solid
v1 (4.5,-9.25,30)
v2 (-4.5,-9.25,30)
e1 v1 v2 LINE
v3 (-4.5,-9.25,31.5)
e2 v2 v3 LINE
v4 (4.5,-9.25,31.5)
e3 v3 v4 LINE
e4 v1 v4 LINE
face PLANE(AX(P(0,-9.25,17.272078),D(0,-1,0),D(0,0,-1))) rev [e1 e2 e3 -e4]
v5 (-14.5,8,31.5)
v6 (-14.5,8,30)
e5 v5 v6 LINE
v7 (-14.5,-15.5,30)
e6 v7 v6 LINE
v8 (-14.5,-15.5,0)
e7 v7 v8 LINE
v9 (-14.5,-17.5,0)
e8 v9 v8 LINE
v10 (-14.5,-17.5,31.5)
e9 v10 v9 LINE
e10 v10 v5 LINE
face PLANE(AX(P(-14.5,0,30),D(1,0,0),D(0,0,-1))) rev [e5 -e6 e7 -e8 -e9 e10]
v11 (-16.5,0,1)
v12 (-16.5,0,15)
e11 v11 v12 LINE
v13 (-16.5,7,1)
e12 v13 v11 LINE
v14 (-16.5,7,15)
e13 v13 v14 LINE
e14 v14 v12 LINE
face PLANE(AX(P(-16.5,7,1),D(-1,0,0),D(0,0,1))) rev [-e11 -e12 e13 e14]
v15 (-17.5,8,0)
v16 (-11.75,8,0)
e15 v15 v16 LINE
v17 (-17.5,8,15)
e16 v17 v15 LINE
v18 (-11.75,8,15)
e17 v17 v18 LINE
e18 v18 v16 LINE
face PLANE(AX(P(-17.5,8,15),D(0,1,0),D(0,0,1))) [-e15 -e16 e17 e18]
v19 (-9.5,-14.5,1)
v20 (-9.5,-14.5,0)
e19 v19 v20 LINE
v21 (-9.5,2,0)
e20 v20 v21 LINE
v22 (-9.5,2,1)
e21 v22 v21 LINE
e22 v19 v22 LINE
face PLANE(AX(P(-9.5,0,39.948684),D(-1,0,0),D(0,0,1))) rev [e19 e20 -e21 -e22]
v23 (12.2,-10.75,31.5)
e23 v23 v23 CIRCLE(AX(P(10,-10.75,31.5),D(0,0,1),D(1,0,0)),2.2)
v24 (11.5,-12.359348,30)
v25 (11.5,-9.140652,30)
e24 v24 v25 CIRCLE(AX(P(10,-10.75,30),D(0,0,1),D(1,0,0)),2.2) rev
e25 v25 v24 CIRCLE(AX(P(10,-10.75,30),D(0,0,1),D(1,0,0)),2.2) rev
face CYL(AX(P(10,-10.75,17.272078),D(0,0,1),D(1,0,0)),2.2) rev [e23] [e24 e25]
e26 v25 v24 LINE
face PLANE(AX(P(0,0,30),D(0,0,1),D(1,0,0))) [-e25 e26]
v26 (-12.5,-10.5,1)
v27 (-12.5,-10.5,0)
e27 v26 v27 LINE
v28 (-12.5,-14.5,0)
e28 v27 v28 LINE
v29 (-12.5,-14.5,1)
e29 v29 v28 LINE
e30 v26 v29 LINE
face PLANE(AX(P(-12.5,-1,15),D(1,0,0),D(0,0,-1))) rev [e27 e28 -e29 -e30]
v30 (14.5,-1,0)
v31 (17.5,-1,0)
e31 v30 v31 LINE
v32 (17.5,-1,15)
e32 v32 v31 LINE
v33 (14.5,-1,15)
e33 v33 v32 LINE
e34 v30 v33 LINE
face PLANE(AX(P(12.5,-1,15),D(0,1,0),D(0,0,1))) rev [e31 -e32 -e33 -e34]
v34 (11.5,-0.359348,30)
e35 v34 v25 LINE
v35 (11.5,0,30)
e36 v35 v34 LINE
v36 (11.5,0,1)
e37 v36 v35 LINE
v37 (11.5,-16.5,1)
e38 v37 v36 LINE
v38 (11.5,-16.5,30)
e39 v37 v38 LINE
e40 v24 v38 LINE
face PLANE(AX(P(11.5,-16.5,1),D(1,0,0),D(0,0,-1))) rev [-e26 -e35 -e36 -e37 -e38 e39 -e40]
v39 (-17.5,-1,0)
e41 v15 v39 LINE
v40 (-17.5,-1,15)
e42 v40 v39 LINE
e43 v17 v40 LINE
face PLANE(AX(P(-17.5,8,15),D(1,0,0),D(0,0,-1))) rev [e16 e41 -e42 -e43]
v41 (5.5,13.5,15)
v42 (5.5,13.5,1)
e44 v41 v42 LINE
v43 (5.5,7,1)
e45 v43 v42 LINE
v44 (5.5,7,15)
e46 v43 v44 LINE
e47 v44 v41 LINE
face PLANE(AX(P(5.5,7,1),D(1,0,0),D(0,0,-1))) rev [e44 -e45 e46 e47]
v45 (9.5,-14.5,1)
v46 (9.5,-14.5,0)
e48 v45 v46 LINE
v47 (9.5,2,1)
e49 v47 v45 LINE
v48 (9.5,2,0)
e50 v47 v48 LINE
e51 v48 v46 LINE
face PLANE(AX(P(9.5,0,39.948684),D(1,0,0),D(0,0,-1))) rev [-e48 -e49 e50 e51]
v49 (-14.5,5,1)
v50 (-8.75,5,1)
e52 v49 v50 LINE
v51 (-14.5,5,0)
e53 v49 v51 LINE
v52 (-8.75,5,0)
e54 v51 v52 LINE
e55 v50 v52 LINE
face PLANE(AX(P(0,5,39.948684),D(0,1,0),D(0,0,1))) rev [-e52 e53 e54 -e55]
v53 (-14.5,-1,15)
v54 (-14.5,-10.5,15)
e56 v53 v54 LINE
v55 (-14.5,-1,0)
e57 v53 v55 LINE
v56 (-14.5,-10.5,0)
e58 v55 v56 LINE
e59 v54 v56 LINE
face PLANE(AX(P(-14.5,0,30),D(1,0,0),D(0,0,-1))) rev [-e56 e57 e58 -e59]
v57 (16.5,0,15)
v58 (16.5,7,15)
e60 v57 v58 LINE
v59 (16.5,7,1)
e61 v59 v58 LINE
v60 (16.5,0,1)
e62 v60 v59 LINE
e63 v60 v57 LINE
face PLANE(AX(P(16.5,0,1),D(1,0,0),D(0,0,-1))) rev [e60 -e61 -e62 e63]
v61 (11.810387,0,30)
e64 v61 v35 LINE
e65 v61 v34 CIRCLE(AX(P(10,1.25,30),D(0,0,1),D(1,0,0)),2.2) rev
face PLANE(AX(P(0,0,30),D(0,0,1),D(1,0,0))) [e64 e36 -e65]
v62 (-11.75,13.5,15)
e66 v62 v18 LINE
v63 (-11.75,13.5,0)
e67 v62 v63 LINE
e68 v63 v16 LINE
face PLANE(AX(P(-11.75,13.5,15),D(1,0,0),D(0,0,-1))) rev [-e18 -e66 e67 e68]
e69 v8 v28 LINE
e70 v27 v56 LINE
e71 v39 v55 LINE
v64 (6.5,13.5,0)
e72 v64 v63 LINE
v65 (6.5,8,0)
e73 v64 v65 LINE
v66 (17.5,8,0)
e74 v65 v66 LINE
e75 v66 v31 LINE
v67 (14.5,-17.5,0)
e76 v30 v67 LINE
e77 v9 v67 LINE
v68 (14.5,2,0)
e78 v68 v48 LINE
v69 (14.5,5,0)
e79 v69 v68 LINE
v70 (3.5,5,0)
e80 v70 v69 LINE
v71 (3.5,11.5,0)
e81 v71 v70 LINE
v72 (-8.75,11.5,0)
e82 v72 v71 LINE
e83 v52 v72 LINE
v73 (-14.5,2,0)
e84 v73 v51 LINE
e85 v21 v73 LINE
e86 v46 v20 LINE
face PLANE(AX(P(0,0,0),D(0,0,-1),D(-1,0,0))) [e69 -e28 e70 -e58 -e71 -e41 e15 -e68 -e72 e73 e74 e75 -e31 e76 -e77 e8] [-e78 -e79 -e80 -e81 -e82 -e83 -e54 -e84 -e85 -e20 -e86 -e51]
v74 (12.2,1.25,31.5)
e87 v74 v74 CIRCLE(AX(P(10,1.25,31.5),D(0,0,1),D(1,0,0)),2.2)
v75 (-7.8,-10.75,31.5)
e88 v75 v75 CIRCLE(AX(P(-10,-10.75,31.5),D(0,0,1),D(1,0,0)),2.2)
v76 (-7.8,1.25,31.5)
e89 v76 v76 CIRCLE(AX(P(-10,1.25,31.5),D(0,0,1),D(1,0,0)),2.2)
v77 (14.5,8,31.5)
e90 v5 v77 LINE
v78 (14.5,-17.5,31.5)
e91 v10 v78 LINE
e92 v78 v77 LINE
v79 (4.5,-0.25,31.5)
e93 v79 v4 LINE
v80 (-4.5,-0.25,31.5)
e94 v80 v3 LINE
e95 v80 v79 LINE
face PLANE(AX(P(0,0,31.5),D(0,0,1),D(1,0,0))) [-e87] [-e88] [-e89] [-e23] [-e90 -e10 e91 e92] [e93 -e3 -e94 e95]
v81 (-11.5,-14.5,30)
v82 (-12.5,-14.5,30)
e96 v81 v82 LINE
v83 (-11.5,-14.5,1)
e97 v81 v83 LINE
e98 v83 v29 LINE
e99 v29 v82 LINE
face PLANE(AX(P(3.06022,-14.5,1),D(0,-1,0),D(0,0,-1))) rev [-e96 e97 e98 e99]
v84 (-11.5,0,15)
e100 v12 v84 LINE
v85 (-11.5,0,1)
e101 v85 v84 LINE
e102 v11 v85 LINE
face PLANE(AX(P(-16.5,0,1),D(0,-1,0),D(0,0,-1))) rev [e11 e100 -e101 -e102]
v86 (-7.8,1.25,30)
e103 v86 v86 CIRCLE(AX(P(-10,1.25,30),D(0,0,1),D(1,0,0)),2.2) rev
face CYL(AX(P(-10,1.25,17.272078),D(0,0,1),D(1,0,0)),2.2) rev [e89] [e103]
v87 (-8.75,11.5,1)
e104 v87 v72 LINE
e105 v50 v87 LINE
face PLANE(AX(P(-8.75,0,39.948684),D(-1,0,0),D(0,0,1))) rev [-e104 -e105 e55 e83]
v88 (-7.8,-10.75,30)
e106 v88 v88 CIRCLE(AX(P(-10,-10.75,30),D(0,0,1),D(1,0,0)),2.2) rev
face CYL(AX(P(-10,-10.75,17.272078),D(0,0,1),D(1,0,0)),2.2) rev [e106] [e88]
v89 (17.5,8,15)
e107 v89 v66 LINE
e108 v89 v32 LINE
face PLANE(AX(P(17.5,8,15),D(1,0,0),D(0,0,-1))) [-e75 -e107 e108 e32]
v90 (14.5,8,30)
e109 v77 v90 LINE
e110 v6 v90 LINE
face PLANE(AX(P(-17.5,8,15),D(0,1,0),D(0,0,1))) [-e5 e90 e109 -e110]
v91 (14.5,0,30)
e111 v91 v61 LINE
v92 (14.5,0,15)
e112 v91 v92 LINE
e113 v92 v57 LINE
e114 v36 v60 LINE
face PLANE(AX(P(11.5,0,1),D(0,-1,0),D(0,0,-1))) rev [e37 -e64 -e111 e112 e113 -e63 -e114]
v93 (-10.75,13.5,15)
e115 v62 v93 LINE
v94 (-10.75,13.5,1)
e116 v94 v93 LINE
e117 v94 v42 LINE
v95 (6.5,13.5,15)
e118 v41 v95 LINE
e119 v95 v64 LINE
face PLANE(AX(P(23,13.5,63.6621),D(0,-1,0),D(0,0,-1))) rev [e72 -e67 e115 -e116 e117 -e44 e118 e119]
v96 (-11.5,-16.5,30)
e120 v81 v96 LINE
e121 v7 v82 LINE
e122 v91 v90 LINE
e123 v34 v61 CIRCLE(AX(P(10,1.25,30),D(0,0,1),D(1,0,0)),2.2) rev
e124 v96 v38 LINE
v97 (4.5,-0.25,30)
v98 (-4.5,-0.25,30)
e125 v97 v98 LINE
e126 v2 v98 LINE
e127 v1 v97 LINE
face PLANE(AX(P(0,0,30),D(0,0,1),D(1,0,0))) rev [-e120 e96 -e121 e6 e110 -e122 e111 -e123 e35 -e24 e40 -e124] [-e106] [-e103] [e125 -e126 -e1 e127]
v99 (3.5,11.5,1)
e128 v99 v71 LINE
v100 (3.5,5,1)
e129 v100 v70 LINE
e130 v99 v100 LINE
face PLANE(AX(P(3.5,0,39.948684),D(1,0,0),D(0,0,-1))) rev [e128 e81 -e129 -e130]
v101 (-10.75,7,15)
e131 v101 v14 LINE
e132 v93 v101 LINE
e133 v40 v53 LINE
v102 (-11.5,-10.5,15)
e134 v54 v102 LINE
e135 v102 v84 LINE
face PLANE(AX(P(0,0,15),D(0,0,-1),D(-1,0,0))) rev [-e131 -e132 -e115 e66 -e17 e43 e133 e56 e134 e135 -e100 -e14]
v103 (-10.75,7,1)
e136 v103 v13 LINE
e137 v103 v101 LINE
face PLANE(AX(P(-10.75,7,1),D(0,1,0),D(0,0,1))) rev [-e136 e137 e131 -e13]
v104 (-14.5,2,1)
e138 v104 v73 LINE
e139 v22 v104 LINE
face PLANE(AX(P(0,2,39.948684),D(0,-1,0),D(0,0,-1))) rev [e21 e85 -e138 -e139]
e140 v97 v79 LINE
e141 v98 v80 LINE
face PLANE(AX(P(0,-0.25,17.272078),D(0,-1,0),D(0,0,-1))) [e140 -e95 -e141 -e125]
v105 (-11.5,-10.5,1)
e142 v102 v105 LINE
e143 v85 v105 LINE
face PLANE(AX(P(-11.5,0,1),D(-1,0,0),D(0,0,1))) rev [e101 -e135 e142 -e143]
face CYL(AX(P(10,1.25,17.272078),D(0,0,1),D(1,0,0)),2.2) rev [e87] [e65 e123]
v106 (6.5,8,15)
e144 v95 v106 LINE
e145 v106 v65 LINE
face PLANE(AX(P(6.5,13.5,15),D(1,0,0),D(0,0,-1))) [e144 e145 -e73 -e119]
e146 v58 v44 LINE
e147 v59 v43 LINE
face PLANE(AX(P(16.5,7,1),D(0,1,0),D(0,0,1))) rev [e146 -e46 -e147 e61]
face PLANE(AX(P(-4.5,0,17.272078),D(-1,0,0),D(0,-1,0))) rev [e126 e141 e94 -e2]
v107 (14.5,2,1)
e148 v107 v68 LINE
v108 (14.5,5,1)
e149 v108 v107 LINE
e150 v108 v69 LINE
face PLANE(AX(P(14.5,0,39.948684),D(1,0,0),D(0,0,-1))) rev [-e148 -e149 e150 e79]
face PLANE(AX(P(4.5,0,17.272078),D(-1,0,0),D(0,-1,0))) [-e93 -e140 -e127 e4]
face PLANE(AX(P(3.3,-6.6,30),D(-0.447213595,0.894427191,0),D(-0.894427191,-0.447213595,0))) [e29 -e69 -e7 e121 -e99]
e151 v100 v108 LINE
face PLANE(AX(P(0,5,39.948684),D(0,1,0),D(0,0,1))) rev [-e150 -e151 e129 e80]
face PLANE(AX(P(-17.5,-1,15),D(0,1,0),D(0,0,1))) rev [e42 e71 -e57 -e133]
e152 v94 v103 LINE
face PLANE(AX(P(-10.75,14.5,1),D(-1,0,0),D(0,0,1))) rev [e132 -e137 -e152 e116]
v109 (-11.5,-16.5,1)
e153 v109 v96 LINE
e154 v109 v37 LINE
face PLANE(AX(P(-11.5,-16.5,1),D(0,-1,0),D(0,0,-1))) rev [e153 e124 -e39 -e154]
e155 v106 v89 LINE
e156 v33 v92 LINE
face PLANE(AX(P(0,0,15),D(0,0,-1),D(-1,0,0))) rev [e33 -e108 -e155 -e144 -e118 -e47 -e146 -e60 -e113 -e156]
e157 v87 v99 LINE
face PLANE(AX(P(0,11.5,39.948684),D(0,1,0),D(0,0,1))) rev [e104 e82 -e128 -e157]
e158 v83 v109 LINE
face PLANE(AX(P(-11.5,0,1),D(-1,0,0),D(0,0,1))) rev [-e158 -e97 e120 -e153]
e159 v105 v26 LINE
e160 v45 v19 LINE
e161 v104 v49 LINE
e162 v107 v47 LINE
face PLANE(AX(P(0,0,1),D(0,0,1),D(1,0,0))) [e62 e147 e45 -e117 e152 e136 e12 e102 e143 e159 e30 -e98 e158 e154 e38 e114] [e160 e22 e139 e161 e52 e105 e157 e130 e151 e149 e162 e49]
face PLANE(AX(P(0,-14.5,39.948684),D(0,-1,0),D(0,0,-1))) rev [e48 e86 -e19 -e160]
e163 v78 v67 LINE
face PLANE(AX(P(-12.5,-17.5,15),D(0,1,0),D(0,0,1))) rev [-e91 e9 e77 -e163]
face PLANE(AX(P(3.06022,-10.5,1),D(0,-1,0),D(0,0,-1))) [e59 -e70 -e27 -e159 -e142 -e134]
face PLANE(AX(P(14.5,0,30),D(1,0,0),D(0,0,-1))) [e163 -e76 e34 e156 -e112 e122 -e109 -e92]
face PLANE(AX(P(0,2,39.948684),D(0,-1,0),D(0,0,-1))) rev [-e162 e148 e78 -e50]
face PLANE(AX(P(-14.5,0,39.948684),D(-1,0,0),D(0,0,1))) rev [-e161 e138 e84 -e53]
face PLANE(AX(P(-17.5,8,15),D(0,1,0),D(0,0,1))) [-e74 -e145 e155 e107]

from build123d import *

# Parameters (mm, degrees)
EXTRUDE_1_DEPTH        = 15
CUT_EXTRUDE_1_DEPTH    = 14
SKETCH_7_W             = 46
SKETCH_7_H             = 6
CUT_EXTRUDE_2_DEPTH    = 1
SKETCH_8_W             = 14
SKETCH_8_H             = 4
CUT_EXTRUDE_3_DEPTH    = 1
CUT_EXTRUDE_6_DEPTH    = 1
EXTRUDE_START          = -30
EXTRUDE_10_OUTLINE_W   = 3
EXTRUDE_10_OUTLINE_H   = 17.5
EXTRUDE_10_OUTLINE_H_2 = 10.5
EXTRUDE_10_OUTLINE_W_2 = 9
EXTRUDE_10_OUTLINE_H_3 = 1
EXTRUDE_10_OUTLINE_W_3 = 2
EXTRUDE_10_DEPTH       = 30
SKETCH_29_W            = 29
SKETCH_29_H            = 25.5
EXTRUDE_12_DEPTH       = 1.5
SKETCH_30_R            = 2.2
SKETCH_30_W            = 9
SKETCH_30_H            = 9
CUT_EXTRUDE_8_DEPTH    = 1.5
SKETCH_31_W            = 1.75
SKETCH_31_H            = 1
EXTRUDE_13_DEPTH       = 15
SKETCH_33_W            = 9
SKETCH_33_H            = 1
SKETCH_33_W_2          = 3.75
CUT_EXTRUDE_9_DEPTH    = 15
SKETCH_38_W            = 3
SKETCH_38_H            = 10.5
CUT_EXTRUDE_11_DEPTH   = 15
SKETCH_39_W            = 29
SKETCH_39_H            = 1
EXTRUDE_14_DEPTH       = 30
SKETCH_40_W            = 48
SKETCH_40_H            = 8
CUT_EXTRUDE_12_DEPTH   = 15


# Read off the part's stored shape, not the designer's step: 凸台-拉伸10
with BuildPart() as part:
    # 草图3 → 凸台-拉伸1 (new body)
    with BuildSketch(Plane.XY):
        Polygon((-25, 21.5), (23, 21.5), (23, 13.5), (6.5, 13.5), (6.5, 8), (17.5, 8), (17.5, -1), (12.5, -1), (12.5, -17.5), (-12.5, -17.5), (-12.5, -1), (-17.5, -1), (-17.5, 8), (-11.75, 8), (-11.75, 13.5), (-25, 13.5), align=None)
    extrude(amount=EXTRUDE_1_DEPTH)

    # 草图4 → 切除-拉伸1 (cut)
    with BuildSketch(Plane.XY.offset(15)):
        Polygon((22, 20.5), (-24, 20.5), (-24, 14.5), (-10.75, 14.5), (-10.75, 7), (-16.5, 7), (-16.5, 0), (-11.5, 0), (-11.5, -16.5), (11.5, -16.5), (11.5, 0), (16.5, 0), (16.5, 7), (5.5, 7), (5.5, 14.5), (22, 14.5), align=None)
    extrude(amount=-CUT_EXTRUDE_1_DEPTH, mode=Mode.SUBTRACT)

    # 草图7 → 切除-拉伸2 (cut)
    with BuildSketch(Plane.XY.offset(1)):
        with Locations((-1, 17.5)):
            Rectangle(SKETCH_7_W, SKETCH_7_H)
    extrude(amount=-CUT_EXTRUDE_2_DEPTH, mode=Mode.SUBTRACT)

    # 草图8 → 切除-拉伸3 (cut)
    with BuildSketch(Plane.ZY.offset(12.5)):
        with Locations((8, -12.5)):
            Rectangle(SKETCH_8_W, SKETCH_8_H)
    extrude(amount=-CUT_EXTRUDE_3_DEPTH, mode=Mode.SUBTRACT)

    # 草图9 → 切除-拉伸6 (cut)
    with BuildSketch(Plane(origin=(0, 0, 0), x_dir=(-1, 0, 0), z_dir=(0, 0, -1))):
        Polygon((-3.5, 11.5), (-3.5, 5), (-14.5, 5), (-14.5, 2), (-9.5, 2), (-9.5, -14.5), (9.5, -14.5), (9.5, 2), (14.5, 2), (14.5, 5), (8.75, 5), (8.75, 11.5), align=None)
    extrude(amount=-CUT_EXTRUDE_6_DEPTH, mode=Mode.SUBTRACT)

    # 凸台-拉伸10 outline → 凸台-拉伸10 (add)
    with BuildSketch(Plane(origin=(0, 0, 0), x_dir=(-1, 0, 0), z_dir=(0, 0, -1)).offset(EXTRUDE_START)):
        with Locations((-13, -8.75)):
            Rectangle(EXTRUDE_10_OUTLINE_W, EXTRUDE_10_OUTLINE_H)
        Polygon((14.5, -15.5), (12.5, -14.5), (11.5, -14.5), (11.5, -17.5), (14.5, -17.5), align=None)
        with Locations((13, -5.25)):
            Rectangle(EXTRUDE_10_OUTLINE_W, EXTRUDE_10_OUTLINE_H_2)
        with Locations((-10, 7.5)):
            Rectangle(EXTRUDE_10_OUTLINE_W_2, EXTRUDE_10_OUTLINE_H_3)
        with Locations((13.5, 7.5)):
            Rectangle(EXTRUDE_10_OUTLINE_W_3, EXTRUDE_10_OUTLINE_H_3)
    extrude(amount=EXTRUDE_10_DEPTH)

    # 草图29 → 凸台-拉伸12 (add)
    with BuildSketch(Plane.XY.offset(30)):
        with Locations((0, -4.75)):
            Rectangle(SKETCH_29_W, SKETCH_29_H)
    extrude(amount=EXTRUDE_12_DEPTH)

    # 草图30 → 切除-拉伸8 (cut)
    with BuildSketch(Plane.XY.offset(31.5)):
        with Locations((-10, 1.25)):
            Circle(SKETCH_30_R)
        with Locations((-10, -10.75)):
            Circle(SKETCH_30_R)
        with Locations((10, 1.25)):
            Circle(SKETCH_30_R)
        with Locations((10, -10.75)):
            Circle(SKETCH_30_R)
        with Locations((0, -4.75)):
            Rectangle(SKETCH_30_W, SKETCH_30_H)
    extrude(amount=-CUT_EXTRUDE_8_DEPTH, mode=Mode.SUBTRACT)

    # 草图31 → 凸台-拉伸13 (add)
    with BuildSketch(Plane.XY.offset(15)):
        with Locations((-11.625, 7.5)):
            Rectangle(SKETCH_31_W, SKETCH_31_H)
    extrude(amount=EXTRUDE_13_DEPTH)

    # 草图33 → 切除-拉伸9 (cut)
    with BuildSketch(Plane.XY.offset(15)):
        with Locations((10, 7.5)):
            Rectangle(SKETCH_33_W, SKETCH_33_H)
        with Locations((-12.625, 7.5)):
            Rectangle(SKETCH_33_W_2, SKETCH_33_H)
    extrude(amount=CUT_EXTRUDE_9_DEPTH, mode=Mode.SUBTRACT)

    # 草图38 → 切除-拉伸11 (cut)
    with BuildSketch(Plane.XY.offset(15)):
        with Locations((-13, -5.25)):
            Rectangle(SKETCH_38_W, SKETCH_38_H)
    extrude(amount=CUT_EXTRUDE_11_DEPTH, mode=Mode.SUBTRACT)

    # 草图39 → 凸台-拉伸14 (add)
    with BuildSketch(Plane(origin=(0, 0, 0), x_dir=(-1, 0, 0), z_dir=(0, 0, -1))):
        with Locations((0, -17)):
            Rectangle(SKETCH_39_W, SKETCH_39_H)
    extrude(amount=-EXTRUDE_14_DEPTH)

    # 草图40 → 切除-拉伸12 (cut)
    with BuildSketch(Plane(origin=(0, 0, 0), x_dir=(-1, 0, 0), z_dir=(0, 0, -1))):
        with Locations((1, 17.5)):
            Rectangle(SKETCH_40_W, SKETCH_40_H)
    extrude(amount=-CUT_EXTRUDE_12_DEPTH, mode=Mode.SUBTRACT)


solid = part.part
